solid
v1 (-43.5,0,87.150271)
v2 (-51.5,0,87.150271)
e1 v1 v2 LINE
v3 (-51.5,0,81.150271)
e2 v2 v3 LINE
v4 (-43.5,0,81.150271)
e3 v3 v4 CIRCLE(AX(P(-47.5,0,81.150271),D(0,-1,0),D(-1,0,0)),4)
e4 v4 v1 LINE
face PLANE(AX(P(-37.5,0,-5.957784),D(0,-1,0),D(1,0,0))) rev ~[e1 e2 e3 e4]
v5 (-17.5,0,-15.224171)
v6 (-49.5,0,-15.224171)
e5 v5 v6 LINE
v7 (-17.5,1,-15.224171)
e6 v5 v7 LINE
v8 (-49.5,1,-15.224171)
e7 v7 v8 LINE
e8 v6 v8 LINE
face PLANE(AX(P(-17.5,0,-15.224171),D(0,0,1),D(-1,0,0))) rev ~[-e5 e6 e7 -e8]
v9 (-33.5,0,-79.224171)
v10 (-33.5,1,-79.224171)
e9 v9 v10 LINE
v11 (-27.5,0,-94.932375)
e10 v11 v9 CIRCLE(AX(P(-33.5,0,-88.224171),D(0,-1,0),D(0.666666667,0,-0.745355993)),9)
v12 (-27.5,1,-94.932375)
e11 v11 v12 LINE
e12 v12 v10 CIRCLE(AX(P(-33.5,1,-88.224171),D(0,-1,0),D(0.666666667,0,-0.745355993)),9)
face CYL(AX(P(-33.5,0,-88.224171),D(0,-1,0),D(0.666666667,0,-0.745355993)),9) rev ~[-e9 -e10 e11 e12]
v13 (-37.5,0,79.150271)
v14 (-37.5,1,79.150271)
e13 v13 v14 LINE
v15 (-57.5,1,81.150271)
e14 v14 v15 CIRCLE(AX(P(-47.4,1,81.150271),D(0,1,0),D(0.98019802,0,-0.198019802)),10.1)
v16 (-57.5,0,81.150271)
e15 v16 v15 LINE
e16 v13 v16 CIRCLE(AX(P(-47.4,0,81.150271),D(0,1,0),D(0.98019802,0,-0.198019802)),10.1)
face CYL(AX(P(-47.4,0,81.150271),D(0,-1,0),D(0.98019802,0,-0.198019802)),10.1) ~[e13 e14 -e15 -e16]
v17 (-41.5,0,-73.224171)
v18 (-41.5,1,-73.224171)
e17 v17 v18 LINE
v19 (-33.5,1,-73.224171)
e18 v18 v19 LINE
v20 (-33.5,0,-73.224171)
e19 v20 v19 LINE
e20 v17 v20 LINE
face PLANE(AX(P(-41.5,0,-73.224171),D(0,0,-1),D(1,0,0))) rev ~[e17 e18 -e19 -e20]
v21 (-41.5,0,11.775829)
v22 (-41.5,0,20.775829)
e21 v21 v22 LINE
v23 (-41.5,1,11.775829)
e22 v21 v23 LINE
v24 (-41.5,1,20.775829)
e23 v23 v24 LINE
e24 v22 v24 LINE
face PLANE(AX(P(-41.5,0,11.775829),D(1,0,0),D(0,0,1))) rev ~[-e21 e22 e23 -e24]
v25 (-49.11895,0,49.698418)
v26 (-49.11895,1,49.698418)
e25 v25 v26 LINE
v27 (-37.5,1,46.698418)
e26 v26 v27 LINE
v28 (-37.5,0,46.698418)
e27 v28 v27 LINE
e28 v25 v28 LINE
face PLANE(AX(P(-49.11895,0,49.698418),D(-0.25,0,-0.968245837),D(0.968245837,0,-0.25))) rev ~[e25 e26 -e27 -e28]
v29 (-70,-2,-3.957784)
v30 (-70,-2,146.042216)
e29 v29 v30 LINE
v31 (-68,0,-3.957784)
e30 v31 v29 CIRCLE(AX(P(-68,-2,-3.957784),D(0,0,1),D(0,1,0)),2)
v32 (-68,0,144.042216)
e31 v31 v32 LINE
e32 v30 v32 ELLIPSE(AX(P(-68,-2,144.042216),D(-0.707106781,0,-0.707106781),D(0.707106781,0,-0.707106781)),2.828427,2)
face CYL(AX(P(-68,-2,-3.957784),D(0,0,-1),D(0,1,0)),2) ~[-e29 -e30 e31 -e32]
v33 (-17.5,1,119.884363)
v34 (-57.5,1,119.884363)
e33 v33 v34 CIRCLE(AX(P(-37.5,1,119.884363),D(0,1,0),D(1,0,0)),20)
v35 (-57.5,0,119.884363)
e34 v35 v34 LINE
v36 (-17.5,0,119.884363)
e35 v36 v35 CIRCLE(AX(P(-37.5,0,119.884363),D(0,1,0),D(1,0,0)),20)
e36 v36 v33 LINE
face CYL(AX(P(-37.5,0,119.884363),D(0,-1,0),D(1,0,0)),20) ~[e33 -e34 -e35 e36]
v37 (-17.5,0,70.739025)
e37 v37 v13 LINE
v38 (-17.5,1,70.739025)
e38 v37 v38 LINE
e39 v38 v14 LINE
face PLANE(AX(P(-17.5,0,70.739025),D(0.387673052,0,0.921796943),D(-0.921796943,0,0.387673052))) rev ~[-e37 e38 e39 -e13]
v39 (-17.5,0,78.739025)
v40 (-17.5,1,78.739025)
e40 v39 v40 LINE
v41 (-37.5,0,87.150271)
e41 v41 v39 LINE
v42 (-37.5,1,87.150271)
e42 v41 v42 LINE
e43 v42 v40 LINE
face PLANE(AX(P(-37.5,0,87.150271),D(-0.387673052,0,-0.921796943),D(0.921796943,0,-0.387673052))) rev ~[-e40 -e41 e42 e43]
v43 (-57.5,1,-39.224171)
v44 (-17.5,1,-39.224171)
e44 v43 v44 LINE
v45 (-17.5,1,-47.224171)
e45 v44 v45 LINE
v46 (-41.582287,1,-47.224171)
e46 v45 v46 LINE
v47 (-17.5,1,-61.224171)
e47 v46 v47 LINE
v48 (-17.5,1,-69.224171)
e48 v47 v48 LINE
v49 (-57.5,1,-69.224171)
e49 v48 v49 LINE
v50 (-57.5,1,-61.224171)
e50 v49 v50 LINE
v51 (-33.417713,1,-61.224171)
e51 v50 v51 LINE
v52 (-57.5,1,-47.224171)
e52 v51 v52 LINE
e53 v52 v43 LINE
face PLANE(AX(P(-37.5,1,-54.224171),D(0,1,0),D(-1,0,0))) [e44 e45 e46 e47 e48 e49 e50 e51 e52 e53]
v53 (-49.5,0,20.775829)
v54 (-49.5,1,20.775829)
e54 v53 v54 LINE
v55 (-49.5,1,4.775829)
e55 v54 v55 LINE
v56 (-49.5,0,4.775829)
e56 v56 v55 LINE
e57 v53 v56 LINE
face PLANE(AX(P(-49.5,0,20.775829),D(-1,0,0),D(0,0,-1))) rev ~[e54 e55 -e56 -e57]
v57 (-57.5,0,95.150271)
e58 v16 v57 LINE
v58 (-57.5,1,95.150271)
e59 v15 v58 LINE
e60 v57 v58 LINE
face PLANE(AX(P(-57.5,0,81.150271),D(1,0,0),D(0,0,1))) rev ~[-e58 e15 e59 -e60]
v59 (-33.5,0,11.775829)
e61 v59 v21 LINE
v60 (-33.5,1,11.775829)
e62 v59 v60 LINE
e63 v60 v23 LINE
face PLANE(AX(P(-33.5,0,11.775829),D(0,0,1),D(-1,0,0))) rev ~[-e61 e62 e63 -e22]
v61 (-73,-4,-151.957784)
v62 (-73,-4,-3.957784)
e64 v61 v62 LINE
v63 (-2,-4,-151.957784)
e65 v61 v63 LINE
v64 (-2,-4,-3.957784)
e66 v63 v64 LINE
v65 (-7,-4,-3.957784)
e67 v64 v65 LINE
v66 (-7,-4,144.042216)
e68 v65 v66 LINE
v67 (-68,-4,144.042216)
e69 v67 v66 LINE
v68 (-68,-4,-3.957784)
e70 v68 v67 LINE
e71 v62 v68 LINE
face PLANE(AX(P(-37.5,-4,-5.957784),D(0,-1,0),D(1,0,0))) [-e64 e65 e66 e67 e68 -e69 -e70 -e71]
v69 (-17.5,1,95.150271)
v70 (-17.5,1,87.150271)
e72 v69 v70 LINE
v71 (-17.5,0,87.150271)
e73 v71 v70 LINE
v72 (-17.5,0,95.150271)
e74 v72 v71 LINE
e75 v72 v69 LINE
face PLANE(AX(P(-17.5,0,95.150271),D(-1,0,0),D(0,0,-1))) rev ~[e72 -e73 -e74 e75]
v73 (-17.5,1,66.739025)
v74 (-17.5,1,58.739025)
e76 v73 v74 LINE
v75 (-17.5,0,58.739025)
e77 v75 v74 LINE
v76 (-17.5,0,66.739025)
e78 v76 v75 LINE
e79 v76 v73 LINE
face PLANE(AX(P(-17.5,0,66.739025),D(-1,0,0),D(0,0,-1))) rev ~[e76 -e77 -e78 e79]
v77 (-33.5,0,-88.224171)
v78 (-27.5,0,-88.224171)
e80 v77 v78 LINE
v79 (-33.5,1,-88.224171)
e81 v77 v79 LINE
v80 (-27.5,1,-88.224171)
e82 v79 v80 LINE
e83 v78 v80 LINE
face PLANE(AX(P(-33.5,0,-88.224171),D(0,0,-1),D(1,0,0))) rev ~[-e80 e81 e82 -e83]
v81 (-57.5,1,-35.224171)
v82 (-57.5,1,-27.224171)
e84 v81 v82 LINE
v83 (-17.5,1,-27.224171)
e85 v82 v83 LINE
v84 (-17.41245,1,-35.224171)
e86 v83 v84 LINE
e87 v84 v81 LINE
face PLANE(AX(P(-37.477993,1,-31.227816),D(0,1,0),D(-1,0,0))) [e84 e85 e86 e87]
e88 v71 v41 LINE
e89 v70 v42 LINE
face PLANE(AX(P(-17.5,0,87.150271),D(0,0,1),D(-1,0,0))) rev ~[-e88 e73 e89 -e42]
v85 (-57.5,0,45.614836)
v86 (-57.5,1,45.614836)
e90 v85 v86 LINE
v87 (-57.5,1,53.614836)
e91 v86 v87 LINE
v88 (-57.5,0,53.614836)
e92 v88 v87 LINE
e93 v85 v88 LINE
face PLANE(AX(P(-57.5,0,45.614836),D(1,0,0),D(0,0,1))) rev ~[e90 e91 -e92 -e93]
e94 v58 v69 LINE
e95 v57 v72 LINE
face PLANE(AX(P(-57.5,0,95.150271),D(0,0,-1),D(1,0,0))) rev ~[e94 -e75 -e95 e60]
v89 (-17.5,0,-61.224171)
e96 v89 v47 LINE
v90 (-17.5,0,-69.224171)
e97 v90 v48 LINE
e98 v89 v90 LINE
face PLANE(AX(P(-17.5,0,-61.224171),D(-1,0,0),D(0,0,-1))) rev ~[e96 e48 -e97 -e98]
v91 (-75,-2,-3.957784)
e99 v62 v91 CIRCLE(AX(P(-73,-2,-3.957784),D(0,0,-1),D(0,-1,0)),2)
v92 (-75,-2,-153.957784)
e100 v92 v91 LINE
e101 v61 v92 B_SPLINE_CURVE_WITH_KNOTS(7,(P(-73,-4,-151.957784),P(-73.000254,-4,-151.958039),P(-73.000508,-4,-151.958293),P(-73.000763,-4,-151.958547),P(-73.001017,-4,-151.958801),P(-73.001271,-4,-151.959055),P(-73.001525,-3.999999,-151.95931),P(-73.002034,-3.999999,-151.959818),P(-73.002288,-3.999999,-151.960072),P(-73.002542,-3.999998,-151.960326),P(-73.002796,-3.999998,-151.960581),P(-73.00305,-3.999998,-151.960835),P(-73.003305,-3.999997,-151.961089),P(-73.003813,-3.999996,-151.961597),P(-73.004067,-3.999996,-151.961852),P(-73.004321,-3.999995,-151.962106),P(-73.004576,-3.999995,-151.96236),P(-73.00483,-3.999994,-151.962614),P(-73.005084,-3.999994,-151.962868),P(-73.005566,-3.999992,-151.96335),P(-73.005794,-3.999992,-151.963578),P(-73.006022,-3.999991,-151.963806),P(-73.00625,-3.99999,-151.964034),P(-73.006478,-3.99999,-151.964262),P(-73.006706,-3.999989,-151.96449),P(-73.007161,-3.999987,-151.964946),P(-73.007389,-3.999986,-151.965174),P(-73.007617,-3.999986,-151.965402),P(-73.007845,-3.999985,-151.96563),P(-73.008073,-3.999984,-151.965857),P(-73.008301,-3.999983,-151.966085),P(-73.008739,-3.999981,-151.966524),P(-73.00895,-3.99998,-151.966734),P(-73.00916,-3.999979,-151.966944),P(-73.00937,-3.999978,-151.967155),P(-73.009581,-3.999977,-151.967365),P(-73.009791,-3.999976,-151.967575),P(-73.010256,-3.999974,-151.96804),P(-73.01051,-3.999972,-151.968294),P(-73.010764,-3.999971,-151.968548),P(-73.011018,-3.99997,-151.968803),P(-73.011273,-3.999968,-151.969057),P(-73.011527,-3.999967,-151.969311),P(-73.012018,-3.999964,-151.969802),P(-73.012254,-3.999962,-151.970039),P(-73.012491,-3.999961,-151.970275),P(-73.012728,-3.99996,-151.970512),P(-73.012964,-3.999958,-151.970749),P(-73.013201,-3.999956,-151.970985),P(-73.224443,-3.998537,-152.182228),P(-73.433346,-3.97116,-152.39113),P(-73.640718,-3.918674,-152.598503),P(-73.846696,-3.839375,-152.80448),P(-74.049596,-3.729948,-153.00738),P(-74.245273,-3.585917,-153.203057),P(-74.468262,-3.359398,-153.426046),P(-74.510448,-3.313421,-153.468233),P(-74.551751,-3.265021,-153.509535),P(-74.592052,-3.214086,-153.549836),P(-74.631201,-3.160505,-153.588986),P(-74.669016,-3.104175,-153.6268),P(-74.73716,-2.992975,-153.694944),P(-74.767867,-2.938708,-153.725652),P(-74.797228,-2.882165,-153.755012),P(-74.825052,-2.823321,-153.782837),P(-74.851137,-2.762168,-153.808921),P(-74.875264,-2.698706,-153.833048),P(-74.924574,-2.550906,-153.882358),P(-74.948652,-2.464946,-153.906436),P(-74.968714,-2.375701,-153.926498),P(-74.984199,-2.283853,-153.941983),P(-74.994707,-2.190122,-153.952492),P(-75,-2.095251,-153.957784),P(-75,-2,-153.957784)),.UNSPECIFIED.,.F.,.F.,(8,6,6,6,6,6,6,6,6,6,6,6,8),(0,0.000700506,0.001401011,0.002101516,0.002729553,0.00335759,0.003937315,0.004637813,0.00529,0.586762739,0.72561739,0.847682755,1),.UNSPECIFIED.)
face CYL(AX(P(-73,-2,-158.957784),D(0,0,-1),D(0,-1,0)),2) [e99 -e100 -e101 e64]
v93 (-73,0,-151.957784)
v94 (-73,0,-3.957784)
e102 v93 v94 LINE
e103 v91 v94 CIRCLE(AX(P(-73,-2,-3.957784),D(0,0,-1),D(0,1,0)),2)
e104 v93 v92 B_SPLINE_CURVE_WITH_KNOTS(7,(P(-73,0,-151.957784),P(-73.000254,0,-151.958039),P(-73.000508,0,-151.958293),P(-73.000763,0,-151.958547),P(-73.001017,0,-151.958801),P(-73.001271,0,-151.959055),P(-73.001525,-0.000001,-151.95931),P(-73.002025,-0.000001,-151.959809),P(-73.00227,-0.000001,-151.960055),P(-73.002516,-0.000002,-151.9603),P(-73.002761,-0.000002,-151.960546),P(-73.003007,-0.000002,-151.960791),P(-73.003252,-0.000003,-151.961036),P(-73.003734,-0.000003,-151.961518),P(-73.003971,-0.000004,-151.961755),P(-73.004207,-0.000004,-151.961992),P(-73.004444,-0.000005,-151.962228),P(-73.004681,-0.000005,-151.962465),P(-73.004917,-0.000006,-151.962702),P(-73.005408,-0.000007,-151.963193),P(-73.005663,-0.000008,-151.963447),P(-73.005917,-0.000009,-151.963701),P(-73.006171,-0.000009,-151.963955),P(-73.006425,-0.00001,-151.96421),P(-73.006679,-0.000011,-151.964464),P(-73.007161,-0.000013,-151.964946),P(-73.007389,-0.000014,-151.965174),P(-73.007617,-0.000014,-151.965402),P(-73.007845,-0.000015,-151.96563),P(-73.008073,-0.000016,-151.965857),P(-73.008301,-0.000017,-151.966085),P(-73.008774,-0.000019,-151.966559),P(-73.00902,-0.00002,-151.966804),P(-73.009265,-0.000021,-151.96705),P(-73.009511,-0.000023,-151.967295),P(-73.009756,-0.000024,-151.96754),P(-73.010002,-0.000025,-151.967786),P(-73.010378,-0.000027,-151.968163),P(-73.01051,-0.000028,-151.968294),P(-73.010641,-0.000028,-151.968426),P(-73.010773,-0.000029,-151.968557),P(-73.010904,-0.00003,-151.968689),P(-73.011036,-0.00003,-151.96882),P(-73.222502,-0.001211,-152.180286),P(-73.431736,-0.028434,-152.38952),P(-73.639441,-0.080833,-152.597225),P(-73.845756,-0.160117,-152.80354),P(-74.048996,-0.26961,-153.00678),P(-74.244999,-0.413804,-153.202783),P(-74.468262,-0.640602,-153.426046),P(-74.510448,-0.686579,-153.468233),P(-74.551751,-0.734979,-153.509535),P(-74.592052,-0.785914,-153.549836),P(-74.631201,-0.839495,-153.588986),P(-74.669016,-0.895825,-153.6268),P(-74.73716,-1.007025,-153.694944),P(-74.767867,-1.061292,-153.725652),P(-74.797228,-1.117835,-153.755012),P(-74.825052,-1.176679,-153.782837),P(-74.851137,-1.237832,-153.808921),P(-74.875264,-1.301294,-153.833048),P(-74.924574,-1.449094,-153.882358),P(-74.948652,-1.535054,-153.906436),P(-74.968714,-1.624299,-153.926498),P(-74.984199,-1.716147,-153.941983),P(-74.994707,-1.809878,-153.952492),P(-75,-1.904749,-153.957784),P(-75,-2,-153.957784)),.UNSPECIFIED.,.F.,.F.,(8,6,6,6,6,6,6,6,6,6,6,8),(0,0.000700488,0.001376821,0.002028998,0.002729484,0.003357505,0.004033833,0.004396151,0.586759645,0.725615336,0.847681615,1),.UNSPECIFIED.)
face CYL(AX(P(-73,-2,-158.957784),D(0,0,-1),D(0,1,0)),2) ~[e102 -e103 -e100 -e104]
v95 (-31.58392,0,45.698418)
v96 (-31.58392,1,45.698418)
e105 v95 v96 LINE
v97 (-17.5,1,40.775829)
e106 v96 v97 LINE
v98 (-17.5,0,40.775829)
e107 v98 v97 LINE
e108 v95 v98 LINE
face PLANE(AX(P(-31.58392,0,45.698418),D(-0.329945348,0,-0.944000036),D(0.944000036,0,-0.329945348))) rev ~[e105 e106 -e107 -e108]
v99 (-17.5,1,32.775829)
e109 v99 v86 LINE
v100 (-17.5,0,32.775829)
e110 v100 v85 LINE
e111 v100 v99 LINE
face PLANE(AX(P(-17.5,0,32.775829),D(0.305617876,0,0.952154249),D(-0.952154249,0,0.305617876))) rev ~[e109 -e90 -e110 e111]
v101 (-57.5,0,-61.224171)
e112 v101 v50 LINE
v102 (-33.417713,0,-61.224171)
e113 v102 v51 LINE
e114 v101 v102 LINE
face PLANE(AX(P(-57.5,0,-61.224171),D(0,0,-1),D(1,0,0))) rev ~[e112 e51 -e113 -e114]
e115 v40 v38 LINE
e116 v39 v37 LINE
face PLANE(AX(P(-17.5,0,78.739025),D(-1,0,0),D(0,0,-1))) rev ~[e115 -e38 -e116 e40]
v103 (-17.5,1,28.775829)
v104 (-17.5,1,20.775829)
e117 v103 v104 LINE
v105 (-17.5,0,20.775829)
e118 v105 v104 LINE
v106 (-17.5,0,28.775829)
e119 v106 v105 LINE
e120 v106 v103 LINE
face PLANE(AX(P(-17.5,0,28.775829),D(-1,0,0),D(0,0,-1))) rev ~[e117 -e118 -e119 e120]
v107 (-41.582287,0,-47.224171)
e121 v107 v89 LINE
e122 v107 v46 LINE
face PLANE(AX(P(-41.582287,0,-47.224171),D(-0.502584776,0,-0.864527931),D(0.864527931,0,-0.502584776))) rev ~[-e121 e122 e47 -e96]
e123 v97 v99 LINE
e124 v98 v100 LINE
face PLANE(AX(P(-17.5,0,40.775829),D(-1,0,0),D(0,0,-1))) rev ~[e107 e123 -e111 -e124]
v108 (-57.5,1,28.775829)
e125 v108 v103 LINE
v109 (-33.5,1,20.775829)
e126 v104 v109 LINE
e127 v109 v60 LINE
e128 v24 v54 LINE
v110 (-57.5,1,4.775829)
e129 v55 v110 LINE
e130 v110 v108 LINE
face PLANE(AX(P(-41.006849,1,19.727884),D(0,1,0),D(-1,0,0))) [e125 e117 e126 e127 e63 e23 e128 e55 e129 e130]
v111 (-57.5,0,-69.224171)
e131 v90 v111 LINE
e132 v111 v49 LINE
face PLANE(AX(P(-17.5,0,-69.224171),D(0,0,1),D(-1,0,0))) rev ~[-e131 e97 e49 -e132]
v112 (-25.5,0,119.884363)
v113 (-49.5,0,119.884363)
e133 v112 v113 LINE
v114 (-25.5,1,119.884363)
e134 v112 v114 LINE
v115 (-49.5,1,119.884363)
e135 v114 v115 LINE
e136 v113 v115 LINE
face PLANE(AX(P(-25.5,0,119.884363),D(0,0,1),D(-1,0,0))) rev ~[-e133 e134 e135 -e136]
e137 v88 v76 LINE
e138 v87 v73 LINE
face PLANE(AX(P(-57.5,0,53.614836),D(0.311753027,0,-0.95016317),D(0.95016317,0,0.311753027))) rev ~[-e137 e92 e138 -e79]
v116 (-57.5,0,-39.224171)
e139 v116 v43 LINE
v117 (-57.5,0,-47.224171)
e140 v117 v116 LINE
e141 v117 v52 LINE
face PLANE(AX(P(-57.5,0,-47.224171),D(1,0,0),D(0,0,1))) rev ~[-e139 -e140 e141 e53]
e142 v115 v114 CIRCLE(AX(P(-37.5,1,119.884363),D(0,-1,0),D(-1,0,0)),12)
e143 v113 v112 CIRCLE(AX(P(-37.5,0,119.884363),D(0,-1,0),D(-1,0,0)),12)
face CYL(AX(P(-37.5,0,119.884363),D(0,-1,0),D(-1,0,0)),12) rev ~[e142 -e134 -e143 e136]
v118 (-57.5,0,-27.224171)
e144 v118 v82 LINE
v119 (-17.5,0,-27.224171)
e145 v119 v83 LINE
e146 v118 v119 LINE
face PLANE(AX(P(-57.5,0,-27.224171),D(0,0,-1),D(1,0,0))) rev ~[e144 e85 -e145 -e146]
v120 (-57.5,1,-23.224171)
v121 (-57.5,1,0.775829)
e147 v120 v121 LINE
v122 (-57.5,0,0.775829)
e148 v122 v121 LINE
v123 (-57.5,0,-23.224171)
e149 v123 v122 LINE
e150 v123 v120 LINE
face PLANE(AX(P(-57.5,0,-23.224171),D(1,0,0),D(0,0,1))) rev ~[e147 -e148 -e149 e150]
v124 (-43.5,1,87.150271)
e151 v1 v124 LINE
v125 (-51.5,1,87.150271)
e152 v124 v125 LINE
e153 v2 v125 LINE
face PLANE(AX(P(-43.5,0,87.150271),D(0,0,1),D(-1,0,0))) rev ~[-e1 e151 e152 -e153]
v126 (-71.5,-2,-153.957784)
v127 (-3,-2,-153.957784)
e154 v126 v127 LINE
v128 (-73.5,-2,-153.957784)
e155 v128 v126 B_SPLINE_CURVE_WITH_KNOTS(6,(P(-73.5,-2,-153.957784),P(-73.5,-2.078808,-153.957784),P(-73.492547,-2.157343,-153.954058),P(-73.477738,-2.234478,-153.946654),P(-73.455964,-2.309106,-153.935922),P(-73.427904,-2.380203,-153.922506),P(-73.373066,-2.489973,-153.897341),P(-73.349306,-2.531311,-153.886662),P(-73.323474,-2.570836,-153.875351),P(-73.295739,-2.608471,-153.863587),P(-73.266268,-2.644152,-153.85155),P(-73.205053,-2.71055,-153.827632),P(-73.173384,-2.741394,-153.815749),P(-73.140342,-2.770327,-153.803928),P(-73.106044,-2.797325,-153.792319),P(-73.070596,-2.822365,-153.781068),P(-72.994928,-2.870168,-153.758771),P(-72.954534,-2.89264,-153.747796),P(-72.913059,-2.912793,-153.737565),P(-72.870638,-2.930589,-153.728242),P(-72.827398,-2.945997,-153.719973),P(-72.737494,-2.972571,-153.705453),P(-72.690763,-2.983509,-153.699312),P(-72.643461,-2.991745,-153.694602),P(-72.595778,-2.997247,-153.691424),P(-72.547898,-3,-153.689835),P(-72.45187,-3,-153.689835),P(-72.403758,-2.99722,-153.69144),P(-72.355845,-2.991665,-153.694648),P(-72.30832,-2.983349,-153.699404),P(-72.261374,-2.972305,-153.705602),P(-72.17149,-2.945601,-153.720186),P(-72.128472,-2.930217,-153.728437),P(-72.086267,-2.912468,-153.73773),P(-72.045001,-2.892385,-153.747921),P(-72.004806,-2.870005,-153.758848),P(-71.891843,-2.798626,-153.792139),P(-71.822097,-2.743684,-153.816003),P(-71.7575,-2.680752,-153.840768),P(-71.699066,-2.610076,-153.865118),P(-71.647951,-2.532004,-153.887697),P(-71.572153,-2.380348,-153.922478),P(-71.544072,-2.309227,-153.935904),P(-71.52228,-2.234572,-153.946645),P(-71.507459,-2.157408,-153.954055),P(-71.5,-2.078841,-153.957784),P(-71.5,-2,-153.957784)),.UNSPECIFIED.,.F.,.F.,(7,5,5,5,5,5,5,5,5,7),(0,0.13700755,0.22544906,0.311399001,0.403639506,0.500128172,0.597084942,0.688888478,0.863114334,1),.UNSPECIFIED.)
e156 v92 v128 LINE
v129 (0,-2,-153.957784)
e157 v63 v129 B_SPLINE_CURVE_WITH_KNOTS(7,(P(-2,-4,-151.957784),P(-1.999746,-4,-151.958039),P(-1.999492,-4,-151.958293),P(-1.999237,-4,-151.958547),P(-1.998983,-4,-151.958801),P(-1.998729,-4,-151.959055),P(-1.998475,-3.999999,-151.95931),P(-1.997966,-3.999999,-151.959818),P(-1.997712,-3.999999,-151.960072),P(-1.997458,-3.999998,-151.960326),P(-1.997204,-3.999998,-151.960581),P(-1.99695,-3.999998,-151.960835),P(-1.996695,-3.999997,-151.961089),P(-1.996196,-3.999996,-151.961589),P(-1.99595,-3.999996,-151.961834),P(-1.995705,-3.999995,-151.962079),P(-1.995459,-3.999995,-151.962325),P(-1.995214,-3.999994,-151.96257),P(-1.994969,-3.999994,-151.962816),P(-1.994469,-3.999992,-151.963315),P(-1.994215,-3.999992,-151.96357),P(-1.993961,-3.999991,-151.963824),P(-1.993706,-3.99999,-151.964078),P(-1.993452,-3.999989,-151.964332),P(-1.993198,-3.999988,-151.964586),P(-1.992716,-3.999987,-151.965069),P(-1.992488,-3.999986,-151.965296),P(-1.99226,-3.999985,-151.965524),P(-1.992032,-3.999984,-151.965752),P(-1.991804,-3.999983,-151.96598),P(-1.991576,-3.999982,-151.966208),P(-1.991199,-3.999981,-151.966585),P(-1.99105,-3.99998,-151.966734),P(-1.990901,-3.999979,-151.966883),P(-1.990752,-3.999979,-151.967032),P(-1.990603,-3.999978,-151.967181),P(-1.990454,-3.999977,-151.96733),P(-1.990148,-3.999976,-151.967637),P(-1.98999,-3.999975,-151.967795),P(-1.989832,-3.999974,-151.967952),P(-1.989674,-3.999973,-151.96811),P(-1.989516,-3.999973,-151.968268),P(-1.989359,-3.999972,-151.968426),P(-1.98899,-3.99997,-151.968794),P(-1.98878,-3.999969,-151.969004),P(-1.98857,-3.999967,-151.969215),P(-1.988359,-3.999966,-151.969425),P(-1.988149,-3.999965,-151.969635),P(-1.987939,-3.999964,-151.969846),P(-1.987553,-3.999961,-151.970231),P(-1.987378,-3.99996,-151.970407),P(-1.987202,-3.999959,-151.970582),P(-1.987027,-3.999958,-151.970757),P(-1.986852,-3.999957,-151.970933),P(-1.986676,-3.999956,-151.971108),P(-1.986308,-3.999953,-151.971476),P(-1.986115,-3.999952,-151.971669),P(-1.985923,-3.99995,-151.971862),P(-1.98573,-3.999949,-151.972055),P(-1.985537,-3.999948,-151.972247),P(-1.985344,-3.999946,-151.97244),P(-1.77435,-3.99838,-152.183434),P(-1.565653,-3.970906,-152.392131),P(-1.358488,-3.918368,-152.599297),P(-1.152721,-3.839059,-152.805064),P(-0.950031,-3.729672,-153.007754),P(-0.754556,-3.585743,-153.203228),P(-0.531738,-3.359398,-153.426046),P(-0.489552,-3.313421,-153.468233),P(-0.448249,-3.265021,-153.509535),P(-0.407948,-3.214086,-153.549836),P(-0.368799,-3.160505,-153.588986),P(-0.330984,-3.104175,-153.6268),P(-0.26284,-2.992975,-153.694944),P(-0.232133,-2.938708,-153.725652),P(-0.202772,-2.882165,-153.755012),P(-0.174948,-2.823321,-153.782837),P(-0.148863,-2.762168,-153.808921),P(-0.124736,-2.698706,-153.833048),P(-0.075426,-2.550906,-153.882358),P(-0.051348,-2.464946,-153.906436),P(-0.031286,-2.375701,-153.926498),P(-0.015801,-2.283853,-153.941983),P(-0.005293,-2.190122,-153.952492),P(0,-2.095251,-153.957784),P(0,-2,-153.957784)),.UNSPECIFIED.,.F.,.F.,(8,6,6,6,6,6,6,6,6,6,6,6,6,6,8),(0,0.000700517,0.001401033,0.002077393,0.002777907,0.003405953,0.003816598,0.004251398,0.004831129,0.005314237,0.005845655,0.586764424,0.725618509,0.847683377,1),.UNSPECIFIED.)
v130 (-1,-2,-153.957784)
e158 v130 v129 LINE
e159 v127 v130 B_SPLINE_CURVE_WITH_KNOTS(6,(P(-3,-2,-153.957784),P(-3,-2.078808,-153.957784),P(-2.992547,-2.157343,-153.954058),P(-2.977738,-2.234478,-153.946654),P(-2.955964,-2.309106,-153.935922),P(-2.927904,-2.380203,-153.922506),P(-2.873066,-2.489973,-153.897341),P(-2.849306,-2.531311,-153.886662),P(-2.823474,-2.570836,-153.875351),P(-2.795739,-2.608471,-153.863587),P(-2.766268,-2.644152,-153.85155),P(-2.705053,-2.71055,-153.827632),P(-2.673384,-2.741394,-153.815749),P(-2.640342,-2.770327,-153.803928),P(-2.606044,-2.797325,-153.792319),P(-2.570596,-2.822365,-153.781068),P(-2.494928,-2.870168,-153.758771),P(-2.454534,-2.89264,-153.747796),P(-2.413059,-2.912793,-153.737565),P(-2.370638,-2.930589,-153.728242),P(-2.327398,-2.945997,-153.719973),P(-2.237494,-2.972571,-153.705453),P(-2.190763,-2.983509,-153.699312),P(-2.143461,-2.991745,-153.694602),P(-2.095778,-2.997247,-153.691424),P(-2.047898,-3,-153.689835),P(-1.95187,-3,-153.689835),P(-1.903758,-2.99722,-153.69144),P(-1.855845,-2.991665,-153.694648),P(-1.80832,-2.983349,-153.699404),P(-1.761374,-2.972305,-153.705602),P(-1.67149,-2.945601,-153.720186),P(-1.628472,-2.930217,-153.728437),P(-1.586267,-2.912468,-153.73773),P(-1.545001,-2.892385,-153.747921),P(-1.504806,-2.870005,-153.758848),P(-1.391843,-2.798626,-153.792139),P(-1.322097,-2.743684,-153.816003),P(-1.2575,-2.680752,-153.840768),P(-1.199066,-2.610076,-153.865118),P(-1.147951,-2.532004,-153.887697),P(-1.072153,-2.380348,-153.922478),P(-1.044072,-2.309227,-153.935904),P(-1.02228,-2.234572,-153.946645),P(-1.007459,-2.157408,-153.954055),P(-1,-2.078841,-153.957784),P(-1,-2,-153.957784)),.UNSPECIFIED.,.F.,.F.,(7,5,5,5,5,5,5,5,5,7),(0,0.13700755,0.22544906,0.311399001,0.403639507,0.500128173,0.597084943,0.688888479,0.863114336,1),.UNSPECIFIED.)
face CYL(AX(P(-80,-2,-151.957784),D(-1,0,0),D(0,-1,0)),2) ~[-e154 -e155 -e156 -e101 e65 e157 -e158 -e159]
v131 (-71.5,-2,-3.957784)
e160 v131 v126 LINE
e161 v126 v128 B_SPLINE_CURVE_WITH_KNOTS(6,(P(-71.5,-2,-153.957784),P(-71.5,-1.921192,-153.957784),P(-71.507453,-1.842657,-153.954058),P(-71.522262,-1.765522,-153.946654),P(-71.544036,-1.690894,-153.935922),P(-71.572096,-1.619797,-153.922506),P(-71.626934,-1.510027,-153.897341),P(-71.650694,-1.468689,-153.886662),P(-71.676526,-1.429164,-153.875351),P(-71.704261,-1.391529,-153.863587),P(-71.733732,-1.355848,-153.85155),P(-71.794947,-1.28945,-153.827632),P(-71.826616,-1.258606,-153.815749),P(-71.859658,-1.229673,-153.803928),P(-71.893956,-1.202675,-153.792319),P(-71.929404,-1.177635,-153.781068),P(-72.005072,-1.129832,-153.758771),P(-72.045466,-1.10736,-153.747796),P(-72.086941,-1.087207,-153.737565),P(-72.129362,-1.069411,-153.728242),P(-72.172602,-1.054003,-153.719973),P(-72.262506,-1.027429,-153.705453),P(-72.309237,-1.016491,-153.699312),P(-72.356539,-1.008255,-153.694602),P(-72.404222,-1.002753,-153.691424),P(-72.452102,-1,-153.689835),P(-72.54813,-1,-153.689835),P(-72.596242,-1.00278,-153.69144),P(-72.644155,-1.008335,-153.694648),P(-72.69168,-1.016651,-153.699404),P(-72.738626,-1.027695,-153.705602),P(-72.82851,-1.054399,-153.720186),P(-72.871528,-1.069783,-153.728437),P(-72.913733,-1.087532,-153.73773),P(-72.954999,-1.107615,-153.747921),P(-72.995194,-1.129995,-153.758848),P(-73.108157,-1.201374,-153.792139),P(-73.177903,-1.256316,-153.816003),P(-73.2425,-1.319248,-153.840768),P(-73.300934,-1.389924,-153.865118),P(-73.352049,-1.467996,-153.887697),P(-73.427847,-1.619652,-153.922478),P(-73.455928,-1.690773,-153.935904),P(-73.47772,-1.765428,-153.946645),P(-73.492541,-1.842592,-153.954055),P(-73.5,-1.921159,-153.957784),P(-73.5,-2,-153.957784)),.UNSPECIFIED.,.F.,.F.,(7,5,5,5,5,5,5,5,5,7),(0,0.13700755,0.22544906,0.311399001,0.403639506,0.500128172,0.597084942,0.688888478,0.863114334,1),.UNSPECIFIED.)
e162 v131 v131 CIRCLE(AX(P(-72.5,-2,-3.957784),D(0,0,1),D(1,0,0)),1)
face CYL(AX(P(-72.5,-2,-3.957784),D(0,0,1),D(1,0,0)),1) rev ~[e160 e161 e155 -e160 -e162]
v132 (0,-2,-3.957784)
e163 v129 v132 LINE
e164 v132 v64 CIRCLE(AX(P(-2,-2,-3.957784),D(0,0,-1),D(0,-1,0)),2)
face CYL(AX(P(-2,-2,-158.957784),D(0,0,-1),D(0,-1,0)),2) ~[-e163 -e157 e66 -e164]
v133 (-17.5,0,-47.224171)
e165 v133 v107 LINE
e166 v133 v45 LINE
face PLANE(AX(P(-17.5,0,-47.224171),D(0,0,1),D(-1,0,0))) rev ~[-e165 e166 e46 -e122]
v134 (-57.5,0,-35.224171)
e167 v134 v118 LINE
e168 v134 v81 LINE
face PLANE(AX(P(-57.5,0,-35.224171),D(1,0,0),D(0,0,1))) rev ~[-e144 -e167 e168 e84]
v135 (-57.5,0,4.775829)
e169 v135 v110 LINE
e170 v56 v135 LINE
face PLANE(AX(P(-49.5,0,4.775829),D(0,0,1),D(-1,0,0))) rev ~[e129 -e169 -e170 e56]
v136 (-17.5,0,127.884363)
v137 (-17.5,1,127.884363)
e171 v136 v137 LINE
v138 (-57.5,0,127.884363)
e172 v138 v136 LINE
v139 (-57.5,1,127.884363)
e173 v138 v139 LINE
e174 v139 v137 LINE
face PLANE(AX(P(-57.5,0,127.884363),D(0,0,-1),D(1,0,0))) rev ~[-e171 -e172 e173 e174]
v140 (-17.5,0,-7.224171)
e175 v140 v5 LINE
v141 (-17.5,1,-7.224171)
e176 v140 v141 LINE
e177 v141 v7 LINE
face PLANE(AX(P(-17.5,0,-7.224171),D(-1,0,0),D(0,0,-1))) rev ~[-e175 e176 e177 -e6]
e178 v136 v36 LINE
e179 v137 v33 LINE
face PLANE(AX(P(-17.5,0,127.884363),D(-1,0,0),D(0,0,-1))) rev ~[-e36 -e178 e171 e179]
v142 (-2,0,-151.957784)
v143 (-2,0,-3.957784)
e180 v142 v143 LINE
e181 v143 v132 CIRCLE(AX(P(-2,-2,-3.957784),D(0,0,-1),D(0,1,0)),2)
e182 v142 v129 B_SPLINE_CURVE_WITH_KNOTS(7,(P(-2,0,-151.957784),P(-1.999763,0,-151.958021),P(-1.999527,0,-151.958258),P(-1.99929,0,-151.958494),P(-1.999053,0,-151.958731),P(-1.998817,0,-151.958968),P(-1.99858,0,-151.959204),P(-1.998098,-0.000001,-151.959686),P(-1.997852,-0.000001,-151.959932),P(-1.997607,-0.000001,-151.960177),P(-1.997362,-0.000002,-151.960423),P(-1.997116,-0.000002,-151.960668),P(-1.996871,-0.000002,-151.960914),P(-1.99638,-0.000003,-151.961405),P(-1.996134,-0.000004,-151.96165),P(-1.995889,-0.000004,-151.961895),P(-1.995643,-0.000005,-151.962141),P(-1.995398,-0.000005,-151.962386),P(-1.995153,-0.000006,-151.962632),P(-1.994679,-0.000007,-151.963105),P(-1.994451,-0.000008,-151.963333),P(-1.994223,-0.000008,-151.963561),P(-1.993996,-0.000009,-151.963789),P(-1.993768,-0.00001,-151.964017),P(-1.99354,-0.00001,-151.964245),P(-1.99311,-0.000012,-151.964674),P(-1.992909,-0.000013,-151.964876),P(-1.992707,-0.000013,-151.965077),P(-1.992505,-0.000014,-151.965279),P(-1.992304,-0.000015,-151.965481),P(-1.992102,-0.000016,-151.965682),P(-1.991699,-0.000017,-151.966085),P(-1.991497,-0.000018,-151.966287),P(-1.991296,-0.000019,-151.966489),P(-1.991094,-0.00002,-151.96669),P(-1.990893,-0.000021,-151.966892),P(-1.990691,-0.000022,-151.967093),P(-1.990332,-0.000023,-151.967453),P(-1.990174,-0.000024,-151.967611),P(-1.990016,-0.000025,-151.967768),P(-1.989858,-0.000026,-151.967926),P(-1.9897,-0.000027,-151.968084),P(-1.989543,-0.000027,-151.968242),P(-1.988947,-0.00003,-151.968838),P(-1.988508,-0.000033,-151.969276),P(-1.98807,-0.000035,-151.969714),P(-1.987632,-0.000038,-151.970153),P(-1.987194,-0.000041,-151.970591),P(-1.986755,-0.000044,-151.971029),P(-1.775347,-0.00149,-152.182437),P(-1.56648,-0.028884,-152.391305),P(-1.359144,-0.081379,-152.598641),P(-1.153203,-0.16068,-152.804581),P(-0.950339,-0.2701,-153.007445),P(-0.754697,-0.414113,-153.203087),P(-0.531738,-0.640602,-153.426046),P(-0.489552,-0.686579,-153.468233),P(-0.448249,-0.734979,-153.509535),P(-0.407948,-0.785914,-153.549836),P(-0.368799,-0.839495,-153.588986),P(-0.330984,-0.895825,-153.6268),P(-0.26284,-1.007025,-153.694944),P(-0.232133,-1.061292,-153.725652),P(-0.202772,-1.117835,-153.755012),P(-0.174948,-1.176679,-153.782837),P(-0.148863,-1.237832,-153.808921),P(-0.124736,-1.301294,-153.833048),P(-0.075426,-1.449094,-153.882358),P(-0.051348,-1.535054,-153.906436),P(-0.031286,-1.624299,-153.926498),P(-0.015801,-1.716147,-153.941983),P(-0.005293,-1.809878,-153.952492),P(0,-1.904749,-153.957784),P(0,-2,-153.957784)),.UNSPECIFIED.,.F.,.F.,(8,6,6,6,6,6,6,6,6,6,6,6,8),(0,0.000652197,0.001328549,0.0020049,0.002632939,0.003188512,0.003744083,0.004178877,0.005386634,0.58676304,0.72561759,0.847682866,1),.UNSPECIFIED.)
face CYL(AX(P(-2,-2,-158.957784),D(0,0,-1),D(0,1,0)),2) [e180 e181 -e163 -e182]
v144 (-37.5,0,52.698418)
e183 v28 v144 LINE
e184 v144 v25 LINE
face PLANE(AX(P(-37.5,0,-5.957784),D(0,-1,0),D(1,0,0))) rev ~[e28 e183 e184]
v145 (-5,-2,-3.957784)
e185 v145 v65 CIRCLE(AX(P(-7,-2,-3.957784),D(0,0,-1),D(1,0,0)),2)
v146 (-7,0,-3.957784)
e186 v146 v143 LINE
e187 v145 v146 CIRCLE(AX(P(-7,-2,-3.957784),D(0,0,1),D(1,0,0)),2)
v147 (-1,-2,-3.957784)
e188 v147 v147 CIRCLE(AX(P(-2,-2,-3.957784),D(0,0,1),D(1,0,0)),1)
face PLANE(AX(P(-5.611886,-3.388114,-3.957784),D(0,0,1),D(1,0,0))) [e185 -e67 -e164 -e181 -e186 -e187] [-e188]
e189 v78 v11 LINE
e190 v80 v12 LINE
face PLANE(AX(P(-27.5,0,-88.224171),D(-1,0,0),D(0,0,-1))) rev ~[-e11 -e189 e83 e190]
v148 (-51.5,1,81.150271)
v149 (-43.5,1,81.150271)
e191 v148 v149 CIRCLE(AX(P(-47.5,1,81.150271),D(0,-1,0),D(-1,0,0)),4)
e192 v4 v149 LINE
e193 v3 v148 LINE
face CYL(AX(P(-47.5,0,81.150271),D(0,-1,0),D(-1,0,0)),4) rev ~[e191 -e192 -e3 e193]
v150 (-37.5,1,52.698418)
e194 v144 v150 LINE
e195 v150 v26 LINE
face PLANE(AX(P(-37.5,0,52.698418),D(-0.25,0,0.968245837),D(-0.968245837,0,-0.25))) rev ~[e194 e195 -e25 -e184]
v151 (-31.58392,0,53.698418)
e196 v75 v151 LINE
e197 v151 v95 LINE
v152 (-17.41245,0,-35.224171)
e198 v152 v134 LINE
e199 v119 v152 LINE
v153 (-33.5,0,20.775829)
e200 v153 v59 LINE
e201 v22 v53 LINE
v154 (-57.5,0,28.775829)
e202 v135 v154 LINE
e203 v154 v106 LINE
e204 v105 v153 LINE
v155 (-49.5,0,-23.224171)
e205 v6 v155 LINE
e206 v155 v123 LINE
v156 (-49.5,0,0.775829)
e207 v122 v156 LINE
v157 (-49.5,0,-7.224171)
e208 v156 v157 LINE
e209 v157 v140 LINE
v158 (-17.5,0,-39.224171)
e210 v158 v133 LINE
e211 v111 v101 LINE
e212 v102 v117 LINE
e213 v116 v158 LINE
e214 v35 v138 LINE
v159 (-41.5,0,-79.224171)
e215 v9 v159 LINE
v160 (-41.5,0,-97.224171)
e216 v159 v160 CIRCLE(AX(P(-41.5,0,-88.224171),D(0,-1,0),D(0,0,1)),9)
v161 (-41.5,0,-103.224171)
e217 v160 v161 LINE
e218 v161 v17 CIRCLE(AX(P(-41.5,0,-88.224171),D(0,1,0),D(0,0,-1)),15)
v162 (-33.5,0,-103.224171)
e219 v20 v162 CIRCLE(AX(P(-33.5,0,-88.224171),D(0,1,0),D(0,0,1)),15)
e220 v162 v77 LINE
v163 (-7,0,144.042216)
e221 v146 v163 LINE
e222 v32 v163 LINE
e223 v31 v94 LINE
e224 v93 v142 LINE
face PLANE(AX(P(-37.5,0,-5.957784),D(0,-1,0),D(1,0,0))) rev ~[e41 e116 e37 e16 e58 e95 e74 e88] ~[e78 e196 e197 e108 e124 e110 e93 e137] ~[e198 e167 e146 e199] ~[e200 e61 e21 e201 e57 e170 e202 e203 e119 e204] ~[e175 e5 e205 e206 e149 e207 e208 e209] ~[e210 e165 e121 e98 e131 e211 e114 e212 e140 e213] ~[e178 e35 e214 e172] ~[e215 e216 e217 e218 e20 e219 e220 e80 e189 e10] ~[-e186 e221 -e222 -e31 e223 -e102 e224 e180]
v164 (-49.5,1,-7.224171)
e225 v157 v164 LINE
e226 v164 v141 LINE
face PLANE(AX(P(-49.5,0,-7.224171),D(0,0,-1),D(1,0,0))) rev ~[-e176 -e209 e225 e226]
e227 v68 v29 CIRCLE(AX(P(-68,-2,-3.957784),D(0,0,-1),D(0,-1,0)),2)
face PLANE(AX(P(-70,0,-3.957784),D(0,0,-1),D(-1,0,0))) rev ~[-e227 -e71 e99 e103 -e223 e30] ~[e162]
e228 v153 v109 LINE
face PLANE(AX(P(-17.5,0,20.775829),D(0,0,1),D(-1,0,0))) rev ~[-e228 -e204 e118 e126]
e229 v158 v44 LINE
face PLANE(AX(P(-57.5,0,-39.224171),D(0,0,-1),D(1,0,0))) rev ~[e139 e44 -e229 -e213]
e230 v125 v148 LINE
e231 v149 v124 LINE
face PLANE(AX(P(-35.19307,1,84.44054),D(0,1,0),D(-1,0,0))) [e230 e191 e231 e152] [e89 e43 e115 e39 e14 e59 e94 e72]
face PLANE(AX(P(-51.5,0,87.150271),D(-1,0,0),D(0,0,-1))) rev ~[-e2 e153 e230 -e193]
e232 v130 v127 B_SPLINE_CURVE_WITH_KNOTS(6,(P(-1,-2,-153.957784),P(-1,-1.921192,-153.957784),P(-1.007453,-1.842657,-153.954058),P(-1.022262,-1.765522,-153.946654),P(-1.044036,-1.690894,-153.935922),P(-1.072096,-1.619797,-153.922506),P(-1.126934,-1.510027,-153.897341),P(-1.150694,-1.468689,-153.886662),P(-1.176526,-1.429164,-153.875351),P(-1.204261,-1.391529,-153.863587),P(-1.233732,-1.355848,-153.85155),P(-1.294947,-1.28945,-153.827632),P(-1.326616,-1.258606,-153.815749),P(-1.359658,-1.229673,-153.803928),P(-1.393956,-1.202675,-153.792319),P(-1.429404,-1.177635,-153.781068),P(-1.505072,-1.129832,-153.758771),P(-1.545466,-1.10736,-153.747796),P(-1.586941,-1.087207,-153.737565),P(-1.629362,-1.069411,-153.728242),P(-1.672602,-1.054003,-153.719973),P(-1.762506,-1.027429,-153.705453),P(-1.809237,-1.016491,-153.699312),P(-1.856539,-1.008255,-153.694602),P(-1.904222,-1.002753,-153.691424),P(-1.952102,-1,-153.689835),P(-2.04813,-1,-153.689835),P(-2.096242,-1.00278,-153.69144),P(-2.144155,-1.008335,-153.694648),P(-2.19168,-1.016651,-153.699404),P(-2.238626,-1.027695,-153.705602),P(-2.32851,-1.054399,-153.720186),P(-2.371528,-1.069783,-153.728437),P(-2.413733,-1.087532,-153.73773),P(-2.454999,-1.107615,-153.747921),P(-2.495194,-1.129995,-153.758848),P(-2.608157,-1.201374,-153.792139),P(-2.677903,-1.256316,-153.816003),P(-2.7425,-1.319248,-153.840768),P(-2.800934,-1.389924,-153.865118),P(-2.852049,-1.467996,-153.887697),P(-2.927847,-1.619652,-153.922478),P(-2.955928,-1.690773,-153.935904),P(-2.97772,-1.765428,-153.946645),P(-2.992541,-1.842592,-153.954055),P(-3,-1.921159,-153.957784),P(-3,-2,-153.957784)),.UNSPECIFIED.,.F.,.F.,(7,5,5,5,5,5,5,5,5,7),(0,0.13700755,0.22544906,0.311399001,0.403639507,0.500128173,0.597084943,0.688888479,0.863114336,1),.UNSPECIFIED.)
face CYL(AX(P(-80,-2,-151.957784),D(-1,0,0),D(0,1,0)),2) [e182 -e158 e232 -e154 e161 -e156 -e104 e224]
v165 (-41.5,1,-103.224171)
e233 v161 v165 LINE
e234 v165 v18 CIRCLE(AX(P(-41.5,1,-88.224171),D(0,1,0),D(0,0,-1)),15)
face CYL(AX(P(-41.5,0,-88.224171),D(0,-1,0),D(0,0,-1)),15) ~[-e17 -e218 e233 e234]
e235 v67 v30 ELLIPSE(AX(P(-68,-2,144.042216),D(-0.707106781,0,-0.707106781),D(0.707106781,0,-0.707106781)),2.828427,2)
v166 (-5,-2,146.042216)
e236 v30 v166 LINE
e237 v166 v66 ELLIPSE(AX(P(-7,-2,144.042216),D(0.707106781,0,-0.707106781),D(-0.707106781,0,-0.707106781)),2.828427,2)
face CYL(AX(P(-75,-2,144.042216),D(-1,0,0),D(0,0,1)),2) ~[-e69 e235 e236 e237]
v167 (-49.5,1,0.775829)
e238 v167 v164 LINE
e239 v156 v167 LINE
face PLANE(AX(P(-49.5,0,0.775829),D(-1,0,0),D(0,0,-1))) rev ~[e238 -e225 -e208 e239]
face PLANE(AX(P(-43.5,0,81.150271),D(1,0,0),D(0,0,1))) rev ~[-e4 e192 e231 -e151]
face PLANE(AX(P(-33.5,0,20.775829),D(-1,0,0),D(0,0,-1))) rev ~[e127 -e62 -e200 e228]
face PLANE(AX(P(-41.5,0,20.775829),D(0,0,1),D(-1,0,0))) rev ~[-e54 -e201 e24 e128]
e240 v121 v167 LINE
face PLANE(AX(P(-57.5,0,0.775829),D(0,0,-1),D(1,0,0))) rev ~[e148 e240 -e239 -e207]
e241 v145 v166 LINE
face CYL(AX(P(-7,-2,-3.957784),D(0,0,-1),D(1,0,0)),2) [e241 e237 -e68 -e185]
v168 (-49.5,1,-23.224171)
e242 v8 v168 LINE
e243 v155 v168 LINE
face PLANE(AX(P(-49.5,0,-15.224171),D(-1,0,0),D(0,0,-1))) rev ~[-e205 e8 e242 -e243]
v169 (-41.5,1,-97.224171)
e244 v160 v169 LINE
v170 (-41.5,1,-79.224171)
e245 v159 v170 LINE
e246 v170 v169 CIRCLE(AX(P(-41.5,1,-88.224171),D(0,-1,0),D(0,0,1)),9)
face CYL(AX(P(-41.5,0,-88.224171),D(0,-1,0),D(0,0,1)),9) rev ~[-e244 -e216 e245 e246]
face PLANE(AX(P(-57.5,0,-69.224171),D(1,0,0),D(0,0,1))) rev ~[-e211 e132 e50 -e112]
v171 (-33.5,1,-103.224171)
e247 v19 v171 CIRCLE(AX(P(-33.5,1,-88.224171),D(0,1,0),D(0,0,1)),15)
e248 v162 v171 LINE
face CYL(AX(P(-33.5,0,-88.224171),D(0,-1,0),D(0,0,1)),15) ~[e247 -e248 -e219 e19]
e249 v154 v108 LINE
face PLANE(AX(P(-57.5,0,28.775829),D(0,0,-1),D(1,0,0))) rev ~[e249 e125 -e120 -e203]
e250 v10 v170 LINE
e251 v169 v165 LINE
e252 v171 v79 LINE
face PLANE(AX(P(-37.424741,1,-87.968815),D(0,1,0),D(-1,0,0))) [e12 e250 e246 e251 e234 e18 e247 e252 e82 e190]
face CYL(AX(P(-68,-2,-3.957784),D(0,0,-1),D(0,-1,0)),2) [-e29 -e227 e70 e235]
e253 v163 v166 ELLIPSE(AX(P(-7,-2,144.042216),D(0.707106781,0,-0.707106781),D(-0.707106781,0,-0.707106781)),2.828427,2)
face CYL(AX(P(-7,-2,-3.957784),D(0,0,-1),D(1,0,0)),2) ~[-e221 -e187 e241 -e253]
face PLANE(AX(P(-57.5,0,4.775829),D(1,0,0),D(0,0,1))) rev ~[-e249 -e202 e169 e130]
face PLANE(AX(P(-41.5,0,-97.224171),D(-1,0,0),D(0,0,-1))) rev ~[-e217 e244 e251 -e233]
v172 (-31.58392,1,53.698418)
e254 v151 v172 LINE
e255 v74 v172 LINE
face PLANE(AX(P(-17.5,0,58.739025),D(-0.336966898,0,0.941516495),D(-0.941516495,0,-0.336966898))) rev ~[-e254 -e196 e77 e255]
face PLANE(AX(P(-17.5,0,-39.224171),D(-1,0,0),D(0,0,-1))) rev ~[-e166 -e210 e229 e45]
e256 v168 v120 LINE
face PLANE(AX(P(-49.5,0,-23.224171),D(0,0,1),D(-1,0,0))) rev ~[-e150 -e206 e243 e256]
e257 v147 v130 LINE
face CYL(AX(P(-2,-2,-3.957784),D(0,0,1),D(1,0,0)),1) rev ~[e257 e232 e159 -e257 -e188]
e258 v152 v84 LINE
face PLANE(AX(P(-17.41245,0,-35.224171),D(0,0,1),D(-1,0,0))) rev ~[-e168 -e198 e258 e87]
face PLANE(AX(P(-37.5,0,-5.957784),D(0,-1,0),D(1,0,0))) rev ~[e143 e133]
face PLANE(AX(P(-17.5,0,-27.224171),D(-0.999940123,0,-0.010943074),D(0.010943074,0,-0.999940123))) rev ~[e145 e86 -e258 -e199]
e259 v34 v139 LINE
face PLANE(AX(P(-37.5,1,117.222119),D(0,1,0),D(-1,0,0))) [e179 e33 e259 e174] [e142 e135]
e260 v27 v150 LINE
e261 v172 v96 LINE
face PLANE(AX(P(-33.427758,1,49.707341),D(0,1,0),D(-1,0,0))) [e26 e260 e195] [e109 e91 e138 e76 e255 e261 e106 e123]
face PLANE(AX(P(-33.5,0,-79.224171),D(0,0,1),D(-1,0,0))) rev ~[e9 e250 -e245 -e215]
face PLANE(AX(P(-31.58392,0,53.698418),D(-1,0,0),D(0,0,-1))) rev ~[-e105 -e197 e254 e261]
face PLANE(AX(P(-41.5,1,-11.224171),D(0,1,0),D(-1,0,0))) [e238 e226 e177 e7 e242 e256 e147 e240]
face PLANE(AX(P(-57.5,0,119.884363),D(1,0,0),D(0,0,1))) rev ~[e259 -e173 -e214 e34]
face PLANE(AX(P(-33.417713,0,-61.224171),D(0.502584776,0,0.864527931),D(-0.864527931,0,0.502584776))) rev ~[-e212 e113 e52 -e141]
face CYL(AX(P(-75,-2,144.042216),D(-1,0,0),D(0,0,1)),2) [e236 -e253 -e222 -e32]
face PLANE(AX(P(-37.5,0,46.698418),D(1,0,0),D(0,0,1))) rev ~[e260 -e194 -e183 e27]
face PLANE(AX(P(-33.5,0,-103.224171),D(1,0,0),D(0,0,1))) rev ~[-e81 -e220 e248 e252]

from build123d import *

# Parameters (mm, degrees)
F1_DEPTH    = 4
F2_R        = 1
F3_DEPTH    = 160.54546
F4_T1_DEPTH = 160
F4_T3_DEPTH = 155
F4_T5_DEPTH = 75
F4_T7_DEPTH = 85
F5_R        = 1
F6_DEPTH    = 158.34369
F8_DEPTH    = 1


# Not quite as in the source:
# - a fillet or chamfer that OpenCascade refuses, or shapes differently, is made with other operations: its cross-section is extruded or revolved along the edge and cut away or added


with BuildPart() as f1:
    # F0 (on Front) → F1 (new body)
    with BuildSketch(Plane.XZ):
        Polygon((-75, -3.9577843381), (-75, -153.9577843381), (0, -153.9577843381), (0, -3.9577843381), (-5, -3.9577843381), (-5, 146.0422156619), (-70, 146.0422156619), (-70, -3.9577843381), align=None)
    extrude(amount=F1_DEPTH)

    # F2 (on face) → F3 (cut)
    with BuildSketch(Plane.XY.offset(-3.9577843381)):
        with Locations((-72.5, -2)):
            Circle(F2_R)
    extrude(amount=-F3_DEPTH, mode=Mode.SUBTRACT)

    # F4: fillet of radius 2 on 12 edges, made by hand

    # F4_s2 → F4_t1 (cut)
    with BuildSketch(Plane.XY.offset(-158.9577843381)):
        with BuildLine():
            ThreePointArc((-73, -4), (-74.4142135624, -3.4142135624), (-75, -2))
            Line((-75, -2), (-75, -4))
            Line((-75, -4), (-73, -4))
        make_face()
        with BuildLine():
            ThreePointArc((-73, 0), (-74.4142135624, -0.5857864376), (-75, -2))
            Line((-75, -2), (-75, 0))
            Line((-75, 0), (-73, 0))
        make_face()
        with BuildLine():
            ThreePointArc((-2, 0), (-0.5857864376, -0.5857864376), (0, -2))
            Line((0, -2), (0, 0))
            Line((0, 0), (-2, 0))
        make_face()
        with BuildLine():
            ThreePointArc((-2, -4), (-0.5857864376, -3.4142135624), (0, -2))
            Line((0, -2), (0, -4))
            Line((0, -4), (-2, -4))
        make_face()
    extrude(amount=F4_T1_DEPTH, mode=Mode.SUBTRACT)

    # F4_s4 → F4_t3 (cut)
    with BuildSketch(Plane.XY.offset(-3.9577843381)):
        with BuildLine():
            ThreePointArc((-68, -4), (-69.4142135624, -3.4142135624), (-70, -2))
            Line((-70, -2), (-70, -4))
            Line((-70, -4), (-68, -4))
        make_face()
        with BuildLine():
            ThreePointArc((-68, 0), (-69.4142135624, -0.5857864376), (-70, -2))
            Line((-70, -2), (-70, 0))
            Line((-70, 0), (-68, 0))
        make_face()
        with BuildLine():
            ThreePointArc((-5, -2), (-5.5857864376, -0.5857864376), (-7, 0))
            Line((-7, 0), (-5, 0))
            Line((-5, 0), (-5, -2))
        make_face()
        with BuildLine():
            ThreePointArc((-5, -2), (-5.5857864376, -3.4142135624), (-7, -4))
            Line((-7, -4), (-5, -4))
            Line((-5, -4), (-5, -2))
        make_face()
    extrude(amount=F4_T3_DEPTH, mode=Mode.SUBTRACT)

    # F4_s6 → F4_t5 (cut)
    with BuildSketch(Plane.YZ.offset(-75)):
        with BuildLine():
            ThreePointArc((-2, 146.0422156619), (-3.4142135624, 145.4564292243), (-4, 144.0422156619))
            Line((-4, 144.0422156619), (-4, 146.0422156619))
            Line((-4, 146.0422156619), (-2, 146.0422156619))
        make_face()
        with BuildLine():
            ThreePointArc((-2, 146.0422156619), (-0.5857864376, 145.4564292243), (0, 144.0422156619))
            Line((0, 144.0422156619), (0, 146.0422156619))
            Line((0, 146.0422156619), (-2, 146.0422156619))
        make_face()
    extrude(amount=F4_T5_DEPTH, mode=Mode.SUBTRACT)

    # F4_s8 → F4_t7 (cut)
    with BuildSketch(Plane.YZ.offset(-80)):
        with BuildLine():
            ThreePointArc((-4, -151.9577843381), (-3.4142135624, -153.3719979004), (-2, -153.9577843381))
            Line((-2, -153.9577843381), (-4, -153.9577843381))
            Line((-4, -153.9577843381), (-4, -151.9577843381))
        make_face()
        with BuildLine():
            ThreePointArc((0, -151.9577843381), (-0.5857864376, -153.3719979004), (-2, -153.9577843381))
            Line((-2, -153.9577843381), (0, -153.9577843381))
            Line((0, -153.9577843381), (0, -151.9577843381))
        make_face()
    extrude(amount=F4_T7_DEPTH, mode=Mode.SUBTRACT)

    # F5 (on face) → F6 (cut)
    with BuildSketch(Plane.XY.offset(-3.9577843381)):
        with Locations((-2, -2)):
            Circle(F5_R)
    extrude(amount=-F6_DEPTH, mode=Mode.SUBTRACT)

    # F7 (on face) → F8 (join)
    with BuildSketch(Plane(origin=(0, 0, 0), x_dir=(-1, 0, 0), z_dir=(0, 1, 0))):
        with BuildLine():
            Line((57.5, 127.8843627218), (17.5, 127.8843627218))
            Line((17.5, 127.8843627218), (17.5, 119.8843627218))
            ThreePointArc((17.5, 119.8843627218), (37.5, 99.8843627218), (57.5, 119.8843627218))
            Line((57.5, 119.8843627218), (57.5, 127.8843627218))
        make_face()
        with BuildLine():
            Line((25.5, 119.8843627218), (49.5, 119.8843627218))
            ThreePointArc((49.5, 119.8843627218), (37.5, 107.8843627218), (25.5, 119.8843627218))
        make_face(mode=Mode.SUBTRACT)
        with BuildLine():
            Line((57.5, 95.1502709985), (17.5, 95.1502709985))
            Line((17.5, 95.1502709985), (17.5, 87.1502709985))
            Line((17.5, 87.1502709985), (37.5, 87.1502709985))
            Line((37.5, 87.1502709985), (17.5, 78.7390248019))
            Line((17.5, 78.7390248019), (17.5, 70.7390248019))
            Line((17.5, 70.7390248019), (37.5, 79.1502709985))
            ThreePointArc((37.5, 79.1502709985), (48.4049875621, 71.1003953774), (57.5, 81.1502709985))
            Line((57.5, 81.1502709985), (57.5, 87.1502709985))
            Line((57.5, 87.1502709985), (57.5, 95.1502709985))
        make_face()
        with BuildLine():
            Line((43.5, 87.1502709985), (51.5, 87.1502709985))
            Line((51.5, 87.1502709985), (51.5, 81.1502709985))
            ThreePointArc((51.5, 81.1502709985), (47.5, 77.1502709985), (43.5, 81.1502709985))
            Line((43.5, 81.1502709985), (43.5, 87.1502709985))
        make_face(mode=Mode.SUBTRACT)
        Polygon((57.5, 53.6148357394), (17.5, 66.7390248019), (17.5, 58.7390248019), (31.5839202169, 53.6984175146), (31.5839202169, 45.6984175146), (17.5, 40.7758287685), (17.5, 32.7758287685), (57.5, 45.6148357394), align=None)
        Polygon((37.5, 52.6984175146), (49.1189500386, 49.6984175146), (37.5, 46.6984175146), align=None, mode=Mode.SUBTRACT)
        Polygon((57.5, 28.7758287685), (17.5, 28.7758287685), (17.5, 20.7758287685), (33.5, 20.7758287685), (33.5, 11.7758287685), (41.5, 11.7758287685), (41.5, 20.7758287685), (49.5, 20.7758287685), (49.5, 4.7758287685), (57.5, 4.7758287685), align=None)
        Polygon((57.5, -23.2241712315), (57.5, 0.7758287685), (49.5, 0.7758287685), (49.5, -7.2241712315), (17.5, -7.2241712315), (17.5, -15.2241712315), (49.5, -15.2241712315), (49.5, -23.2241712315), align=None)
        Polygon((57.5, -35.2241712315), (57.5, -27.2241712315), (17.5, -27.2241712315), (17.4124501646, -35.2241712315), align=None)
        Polygon((57.5, -47.2241712315), (57.5, -39.2241712315), (17.5, -39.2241712315), (17.5, -47.2241712315), (41.5822874359, -47.2241712315), (17.5, -61.2241712315), (17.5, -69.2241712315), (57.5, -69.2241712315), (57.5, -61.2241712315), (33.4177125641, -61.2241712315), align=None)
        with BuildLine():
            Line((41.5, -97.2241712315), (41.5, -103.2241712315))
            ThreePointArc((41.5, -103.2241712315), (56.5, -88.2241712315), (41.5, -73.2241712315))
            Line((41.5, -73.2241712315), (33.5, -73.2241712315))
            ThreePointArc((33.5, -73.2241712315), (18.5, -88.2241712315), (33.5, -103.2241712315))
            Line((33.5, -103.2241712315), (33.5, -97.2241712315))
            ThreePointArc((33.5, -97.2241712315), (30.288601192, -96.6317224622), (27.5, -94.932375164))
            ThreePointArc((27.5, -94.932375164), (25.0924487693, -85.0127724236), (33.5, -79.2241712315))
            Line((33.5, -79.2241712315), (41.5, -79.2241712315))
            ThreePointArc((41.5, -79.2241712315), (50.5, -88.2241712315), (41.5, -97.2241712315))
        make_face()
        with BuildLine():
            ThreePointArc((27.5, -94.932375164), (30.288601192, -96.6317224622), (33.5, -97.2241712315))
            Line((33.5, -97.2241712315), (33.5, -88.2241712315))
            Line((33.5, -88.2241712315), (27.5, -88.2241712315))
            Line((27.5, -88.2241712315), (27.5, -94.932375164))
        make_face()
    extrude(amount=F8_DEPTH)


solid = f1.part
